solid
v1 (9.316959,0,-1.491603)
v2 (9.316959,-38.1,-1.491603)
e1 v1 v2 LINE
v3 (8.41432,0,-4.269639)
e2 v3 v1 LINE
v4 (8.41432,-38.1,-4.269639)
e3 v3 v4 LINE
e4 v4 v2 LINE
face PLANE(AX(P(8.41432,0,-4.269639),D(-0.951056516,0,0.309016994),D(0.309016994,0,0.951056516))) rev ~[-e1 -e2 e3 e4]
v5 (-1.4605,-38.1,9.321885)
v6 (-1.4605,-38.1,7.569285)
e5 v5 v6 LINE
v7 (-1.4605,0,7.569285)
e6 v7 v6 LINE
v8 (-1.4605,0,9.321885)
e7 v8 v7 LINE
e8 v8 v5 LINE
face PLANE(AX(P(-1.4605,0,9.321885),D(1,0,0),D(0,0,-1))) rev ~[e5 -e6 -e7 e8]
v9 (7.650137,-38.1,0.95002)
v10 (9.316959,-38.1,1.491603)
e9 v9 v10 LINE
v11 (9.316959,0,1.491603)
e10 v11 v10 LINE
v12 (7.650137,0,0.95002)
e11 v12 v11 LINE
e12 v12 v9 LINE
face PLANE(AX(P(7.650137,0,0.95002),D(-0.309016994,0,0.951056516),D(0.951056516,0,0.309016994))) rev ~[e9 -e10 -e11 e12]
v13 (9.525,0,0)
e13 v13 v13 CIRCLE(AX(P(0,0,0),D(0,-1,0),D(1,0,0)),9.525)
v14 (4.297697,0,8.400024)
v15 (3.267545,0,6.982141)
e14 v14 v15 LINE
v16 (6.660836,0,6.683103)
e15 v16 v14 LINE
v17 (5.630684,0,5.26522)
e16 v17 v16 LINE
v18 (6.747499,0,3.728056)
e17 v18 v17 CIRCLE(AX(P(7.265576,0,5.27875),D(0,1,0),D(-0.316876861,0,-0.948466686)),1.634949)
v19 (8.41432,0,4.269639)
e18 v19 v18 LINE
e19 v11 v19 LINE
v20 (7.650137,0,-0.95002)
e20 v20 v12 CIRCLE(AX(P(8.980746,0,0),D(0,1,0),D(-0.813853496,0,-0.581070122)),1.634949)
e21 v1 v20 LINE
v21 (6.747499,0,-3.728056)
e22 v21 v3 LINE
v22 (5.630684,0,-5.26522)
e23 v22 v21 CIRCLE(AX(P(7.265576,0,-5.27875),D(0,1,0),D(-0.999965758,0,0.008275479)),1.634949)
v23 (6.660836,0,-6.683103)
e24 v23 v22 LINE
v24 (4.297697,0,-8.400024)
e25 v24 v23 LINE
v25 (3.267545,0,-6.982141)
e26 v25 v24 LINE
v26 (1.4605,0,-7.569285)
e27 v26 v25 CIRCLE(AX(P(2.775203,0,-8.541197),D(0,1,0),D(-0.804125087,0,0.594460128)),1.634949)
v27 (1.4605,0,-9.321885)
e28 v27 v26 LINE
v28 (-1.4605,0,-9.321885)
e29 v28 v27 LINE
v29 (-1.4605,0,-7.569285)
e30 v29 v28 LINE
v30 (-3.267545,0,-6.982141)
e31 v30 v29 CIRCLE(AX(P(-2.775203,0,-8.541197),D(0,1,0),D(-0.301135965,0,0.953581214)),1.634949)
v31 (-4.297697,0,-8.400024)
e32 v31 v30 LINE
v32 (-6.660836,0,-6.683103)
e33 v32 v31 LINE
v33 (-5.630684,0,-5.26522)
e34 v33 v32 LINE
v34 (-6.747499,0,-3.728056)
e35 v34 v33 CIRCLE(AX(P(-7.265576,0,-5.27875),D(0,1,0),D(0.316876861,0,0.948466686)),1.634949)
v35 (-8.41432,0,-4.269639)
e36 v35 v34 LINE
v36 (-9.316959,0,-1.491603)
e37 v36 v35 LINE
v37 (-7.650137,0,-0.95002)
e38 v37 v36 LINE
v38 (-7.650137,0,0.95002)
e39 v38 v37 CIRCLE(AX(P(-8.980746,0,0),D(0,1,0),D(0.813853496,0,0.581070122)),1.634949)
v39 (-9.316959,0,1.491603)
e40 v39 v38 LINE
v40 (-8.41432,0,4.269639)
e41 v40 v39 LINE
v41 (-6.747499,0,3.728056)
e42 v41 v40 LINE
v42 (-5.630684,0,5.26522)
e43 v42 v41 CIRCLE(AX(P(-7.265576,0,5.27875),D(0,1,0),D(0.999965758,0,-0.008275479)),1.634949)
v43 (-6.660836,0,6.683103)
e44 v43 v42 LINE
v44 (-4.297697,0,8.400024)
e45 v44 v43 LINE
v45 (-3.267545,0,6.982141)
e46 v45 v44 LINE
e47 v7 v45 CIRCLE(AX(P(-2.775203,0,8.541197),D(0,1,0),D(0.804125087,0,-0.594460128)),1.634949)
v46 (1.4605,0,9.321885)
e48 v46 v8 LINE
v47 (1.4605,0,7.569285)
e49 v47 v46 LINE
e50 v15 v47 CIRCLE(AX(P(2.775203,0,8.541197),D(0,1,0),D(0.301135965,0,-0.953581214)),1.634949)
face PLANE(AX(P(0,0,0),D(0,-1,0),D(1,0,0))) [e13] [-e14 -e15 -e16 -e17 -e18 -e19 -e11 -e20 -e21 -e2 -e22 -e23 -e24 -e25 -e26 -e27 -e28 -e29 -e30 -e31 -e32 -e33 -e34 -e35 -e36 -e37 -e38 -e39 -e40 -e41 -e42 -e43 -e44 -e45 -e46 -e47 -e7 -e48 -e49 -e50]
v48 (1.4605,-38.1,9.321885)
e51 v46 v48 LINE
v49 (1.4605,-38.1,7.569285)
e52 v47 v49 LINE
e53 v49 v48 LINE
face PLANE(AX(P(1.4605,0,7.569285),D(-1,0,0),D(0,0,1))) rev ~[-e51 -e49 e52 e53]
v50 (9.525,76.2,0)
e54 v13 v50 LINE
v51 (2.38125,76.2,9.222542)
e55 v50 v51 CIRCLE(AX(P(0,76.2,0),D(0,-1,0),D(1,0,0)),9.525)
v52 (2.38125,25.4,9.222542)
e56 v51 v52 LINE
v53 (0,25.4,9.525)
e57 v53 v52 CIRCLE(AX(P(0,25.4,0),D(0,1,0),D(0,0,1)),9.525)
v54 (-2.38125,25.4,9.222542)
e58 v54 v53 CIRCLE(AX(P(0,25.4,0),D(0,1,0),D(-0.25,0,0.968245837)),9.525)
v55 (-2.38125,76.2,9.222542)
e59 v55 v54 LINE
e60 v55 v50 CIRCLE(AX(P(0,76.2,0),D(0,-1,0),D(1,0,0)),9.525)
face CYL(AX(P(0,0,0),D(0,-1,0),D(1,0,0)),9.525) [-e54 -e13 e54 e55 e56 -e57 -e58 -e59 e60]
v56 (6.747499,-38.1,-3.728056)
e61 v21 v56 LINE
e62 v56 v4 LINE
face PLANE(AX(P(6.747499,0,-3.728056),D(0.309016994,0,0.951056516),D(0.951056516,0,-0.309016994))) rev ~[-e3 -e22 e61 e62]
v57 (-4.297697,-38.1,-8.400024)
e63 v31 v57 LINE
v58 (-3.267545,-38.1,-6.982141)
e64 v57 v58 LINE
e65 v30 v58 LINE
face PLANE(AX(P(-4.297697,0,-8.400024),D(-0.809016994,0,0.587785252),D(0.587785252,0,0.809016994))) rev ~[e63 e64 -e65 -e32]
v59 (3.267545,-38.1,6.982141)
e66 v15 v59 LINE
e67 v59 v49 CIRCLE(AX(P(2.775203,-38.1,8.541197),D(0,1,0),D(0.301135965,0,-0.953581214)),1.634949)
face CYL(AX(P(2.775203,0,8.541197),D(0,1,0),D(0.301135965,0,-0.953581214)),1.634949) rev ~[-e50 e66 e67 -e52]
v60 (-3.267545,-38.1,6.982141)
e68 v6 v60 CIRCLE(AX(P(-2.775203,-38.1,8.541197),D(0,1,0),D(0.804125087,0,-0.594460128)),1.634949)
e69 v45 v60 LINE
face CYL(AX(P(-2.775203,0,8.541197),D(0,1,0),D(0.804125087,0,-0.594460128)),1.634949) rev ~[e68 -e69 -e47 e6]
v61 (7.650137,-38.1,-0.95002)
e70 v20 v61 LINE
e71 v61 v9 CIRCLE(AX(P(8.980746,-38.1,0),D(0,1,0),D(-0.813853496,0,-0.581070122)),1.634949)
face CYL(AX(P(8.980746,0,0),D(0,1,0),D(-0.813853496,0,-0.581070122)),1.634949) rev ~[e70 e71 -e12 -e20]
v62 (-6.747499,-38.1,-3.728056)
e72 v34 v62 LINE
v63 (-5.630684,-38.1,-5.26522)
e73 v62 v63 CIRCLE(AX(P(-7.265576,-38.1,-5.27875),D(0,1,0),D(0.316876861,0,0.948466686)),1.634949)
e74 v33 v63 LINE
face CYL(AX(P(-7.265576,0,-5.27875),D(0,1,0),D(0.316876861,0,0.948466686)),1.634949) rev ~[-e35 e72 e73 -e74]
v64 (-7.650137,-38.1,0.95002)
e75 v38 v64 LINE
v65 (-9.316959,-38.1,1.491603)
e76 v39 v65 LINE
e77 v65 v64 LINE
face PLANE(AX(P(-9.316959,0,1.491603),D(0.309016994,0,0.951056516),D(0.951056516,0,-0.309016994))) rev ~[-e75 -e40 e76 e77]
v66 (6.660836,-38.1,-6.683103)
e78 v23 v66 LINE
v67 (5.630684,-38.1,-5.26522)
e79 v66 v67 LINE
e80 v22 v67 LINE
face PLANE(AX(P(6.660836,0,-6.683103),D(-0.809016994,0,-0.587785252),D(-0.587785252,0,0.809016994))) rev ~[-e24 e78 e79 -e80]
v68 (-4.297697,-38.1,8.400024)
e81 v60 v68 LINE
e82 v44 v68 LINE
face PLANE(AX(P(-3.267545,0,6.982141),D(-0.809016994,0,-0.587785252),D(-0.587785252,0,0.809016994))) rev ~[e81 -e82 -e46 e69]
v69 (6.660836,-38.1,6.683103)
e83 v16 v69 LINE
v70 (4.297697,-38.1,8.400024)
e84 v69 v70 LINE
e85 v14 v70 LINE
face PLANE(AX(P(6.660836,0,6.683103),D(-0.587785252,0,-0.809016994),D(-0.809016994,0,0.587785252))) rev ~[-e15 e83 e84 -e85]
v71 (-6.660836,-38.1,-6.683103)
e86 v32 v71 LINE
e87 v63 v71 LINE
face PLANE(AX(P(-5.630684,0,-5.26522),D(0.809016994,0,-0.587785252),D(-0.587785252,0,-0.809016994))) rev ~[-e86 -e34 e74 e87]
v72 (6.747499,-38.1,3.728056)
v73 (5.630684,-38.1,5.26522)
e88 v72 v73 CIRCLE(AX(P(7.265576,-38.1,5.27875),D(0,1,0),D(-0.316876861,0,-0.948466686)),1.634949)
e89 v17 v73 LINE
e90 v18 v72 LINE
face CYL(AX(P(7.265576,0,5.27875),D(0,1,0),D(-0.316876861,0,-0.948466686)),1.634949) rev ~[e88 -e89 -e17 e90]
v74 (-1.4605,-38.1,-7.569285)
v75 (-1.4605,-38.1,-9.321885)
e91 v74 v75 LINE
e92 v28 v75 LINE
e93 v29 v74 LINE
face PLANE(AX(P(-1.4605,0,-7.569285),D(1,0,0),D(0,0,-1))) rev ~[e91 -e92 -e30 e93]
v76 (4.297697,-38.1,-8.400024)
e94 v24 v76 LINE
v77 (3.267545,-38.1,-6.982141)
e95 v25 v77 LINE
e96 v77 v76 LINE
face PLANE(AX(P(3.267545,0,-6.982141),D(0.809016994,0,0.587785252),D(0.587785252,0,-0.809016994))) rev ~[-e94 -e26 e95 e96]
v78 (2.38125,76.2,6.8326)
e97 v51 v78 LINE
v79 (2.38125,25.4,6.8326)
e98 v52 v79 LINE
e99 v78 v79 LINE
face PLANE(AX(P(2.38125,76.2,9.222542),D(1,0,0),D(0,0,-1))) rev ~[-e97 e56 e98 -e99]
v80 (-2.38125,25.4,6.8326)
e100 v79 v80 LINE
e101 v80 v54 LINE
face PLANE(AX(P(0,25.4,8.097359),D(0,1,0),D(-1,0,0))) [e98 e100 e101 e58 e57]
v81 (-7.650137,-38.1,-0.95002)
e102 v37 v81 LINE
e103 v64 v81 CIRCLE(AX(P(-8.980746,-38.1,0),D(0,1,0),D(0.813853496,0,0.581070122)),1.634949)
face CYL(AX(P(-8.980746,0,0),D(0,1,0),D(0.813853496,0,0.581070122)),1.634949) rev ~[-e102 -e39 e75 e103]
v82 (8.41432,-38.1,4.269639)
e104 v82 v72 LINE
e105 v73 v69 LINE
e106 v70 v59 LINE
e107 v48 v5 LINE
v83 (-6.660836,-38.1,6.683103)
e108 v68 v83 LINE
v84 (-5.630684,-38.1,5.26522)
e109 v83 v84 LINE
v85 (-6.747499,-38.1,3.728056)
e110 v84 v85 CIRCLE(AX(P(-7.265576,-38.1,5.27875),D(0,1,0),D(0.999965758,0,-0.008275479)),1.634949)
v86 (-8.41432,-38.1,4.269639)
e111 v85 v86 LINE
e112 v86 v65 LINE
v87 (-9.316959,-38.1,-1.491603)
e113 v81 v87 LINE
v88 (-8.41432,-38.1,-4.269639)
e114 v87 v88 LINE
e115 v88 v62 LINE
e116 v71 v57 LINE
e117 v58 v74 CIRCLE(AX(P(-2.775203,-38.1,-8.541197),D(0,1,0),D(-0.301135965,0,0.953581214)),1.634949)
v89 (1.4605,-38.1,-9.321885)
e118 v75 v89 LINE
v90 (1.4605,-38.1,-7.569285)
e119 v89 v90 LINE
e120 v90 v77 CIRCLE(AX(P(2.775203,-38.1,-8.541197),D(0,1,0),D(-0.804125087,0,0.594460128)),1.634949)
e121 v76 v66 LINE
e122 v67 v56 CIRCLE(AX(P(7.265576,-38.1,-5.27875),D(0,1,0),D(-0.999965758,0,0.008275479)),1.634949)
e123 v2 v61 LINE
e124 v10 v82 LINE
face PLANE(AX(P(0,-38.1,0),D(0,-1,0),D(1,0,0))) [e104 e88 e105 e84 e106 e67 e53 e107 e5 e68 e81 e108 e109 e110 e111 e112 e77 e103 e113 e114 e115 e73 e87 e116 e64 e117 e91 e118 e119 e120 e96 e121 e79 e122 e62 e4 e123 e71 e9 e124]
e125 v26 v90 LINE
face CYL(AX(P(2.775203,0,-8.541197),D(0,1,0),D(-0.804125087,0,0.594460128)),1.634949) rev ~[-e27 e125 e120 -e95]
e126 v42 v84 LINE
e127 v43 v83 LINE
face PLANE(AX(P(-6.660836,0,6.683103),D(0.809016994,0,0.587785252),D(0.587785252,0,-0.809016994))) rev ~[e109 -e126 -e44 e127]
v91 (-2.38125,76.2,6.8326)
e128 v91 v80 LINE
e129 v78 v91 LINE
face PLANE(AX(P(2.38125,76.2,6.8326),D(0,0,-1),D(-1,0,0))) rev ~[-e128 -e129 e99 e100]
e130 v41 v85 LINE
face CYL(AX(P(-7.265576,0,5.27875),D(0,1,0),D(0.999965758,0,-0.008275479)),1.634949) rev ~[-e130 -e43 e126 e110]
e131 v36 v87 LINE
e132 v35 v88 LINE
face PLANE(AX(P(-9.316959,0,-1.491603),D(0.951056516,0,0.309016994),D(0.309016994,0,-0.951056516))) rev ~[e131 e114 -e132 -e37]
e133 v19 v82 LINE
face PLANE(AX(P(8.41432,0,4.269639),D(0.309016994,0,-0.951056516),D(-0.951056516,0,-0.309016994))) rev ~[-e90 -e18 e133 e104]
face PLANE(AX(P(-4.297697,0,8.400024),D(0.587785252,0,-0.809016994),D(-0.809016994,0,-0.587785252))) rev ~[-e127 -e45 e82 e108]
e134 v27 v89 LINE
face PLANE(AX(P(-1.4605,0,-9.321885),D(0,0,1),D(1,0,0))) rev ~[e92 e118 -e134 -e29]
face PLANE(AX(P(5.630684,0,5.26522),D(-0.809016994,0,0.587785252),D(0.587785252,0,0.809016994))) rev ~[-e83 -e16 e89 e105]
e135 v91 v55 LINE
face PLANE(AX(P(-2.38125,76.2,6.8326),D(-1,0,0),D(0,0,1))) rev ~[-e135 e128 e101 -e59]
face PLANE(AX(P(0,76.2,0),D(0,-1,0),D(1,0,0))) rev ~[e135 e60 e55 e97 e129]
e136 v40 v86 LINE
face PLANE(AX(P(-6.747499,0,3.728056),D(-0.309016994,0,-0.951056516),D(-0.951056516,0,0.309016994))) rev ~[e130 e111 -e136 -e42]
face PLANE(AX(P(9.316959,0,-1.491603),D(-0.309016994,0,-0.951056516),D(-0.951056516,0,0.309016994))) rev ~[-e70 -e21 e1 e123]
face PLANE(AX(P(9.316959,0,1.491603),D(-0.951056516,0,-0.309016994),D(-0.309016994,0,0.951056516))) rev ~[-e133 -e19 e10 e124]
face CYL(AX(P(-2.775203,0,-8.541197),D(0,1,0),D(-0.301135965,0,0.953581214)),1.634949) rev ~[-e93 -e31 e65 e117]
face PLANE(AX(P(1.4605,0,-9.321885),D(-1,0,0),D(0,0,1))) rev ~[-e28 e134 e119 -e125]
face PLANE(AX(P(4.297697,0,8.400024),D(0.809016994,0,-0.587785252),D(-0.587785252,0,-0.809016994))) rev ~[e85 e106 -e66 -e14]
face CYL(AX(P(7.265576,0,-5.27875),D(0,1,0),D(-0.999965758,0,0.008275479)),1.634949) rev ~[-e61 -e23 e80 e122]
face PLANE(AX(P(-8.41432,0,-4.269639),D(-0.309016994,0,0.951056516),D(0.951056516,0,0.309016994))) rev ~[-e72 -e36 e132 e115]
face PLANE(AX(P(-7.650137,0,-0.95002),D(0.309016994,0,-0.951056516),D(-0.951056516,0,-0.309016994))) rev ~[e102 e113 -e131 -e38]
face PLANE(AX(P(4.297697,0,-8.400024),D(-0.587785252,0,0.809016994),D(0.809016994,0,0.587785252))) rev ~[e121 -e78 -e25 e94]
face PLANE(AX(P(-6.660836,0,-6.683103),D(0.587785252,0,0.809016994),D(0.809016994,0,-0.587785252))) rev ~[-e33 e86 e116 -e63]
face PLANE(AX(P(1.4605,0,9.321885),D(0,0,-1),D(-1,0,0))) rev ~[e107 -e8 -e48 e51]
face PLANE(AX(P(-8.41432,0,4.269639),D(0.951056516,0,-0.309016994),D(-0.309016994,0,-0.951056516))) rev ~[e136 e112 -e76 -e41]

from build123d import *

# Parameters (mm, degrees)
F1_DEPTH = 38.1
F2_R     = 9.525
F3_DEPTH = 76.2
F5_DEPTH = 50.8


# Not quite as in the source:
# - a feature names something its author has since deleted; it is built from what else it names


with BuildPart() as f1:
    # F0 (on Front) → F1 (new body)
    with BuildSketch(Plane.XZ):
        with BuildLine():
            Line((1.4605, 7.5692852344), (1.4605, 9.3218852344))
            Line((1.4605, 9.3218852344), (-1.4605, 9.3218852344))
            Line((-1.4605, 9.3218852344), (-1.4605, 7.5692852344))
            ThreePointArc((-1.4605, 7.5692852344), (-2.2699762391, 6.9862685009), (-3.2675449109, 6.9821407509))
            Line((-3.2675449109, 6.9821407509), (-4.2976973441, 8.4000239352))
            Line((-4.2976973441, 8.4000239352), (-6.6608359846, 6.6831032133))
            Line((-6.6608359846, 6.6831032133), (-5.6306835515, 5.2652200289))
            ThreePointArc((-5.6306835515, 5.2652200289), (-5.9428749476, 4.3177513881), (-6.7474987256, 3.7280558148))
            Line((-6.7474987256, 3.7280558148), (-8.4143203761, 4.2696389991))
            Line((-8.4143203761, 4.2696389991), (-9.3169590166, 1.491602915))
            Line((-9.3169590166, 1.491602915), (-7.6501373662, 0.9500197307))
            ThreePointArc((-7.6501373662, 0.9500197307), (-7.3457974171, 0), (-7.6501373662, -0.9500197307))
            Line((-7.6501373662, -0.9500197307), (-9.3169590166, -1.491602915))
            Line((-9.3169590166, -1.491602915), (-8.4143203761, -4.2696389991))
            Line((-8.4143203761, -4.2696389991), (-6.7474987256, -3.7280558148))
            ThreePointArc((-6.7474987256, -3.7280558148), (-5.9428749476, -4.3177513881), (-5.6306835515, -5.2652200289))
            Line((-5.6306835515, -5.2652200289), (-6.6608359846, -6.6831032133))
            Line((-6.6608359846, -6.6831032133), (-4.2976973441, -8.4000239352))
            Line((-4.2976973441, -8.4000239352), (-3.2675449109, -6.9821407509))
            ThreePointArc((-3.2675449109, -6.9821407509), (-2.2699762391, -6.9862685009), (-1.4605, -7.5692852344))
            Line((-1.4605, -7.5692852344), (-1.4605, -9.3218852344))
            Line((-1.4605, -9.3218852344), (1.4605, -9.3218852344))
            Line((1.4605, -9.3218852344), (1.4605, -7.5692852344))
            ThreePointArc((1.4605, -7.5692852344), (2.2699762391, -6.9862685009), (3.2675449109, -6.9821407509))
            Line((3.2675449109, -6.9821407509), (4.2976973441, -8.4000239352))
            Line((4.2976973441, -8.4000239352), (6.6608359846, -6.6831032133))
            Line((6.6608359846, -6.6831032133), (5.6306835515, -5.2652200289))
            ThreePointArc((5.6306835515, -5.2652200289), (5.9428749476, -4.3177513881), (6.7474987256, -3.7280558148))
            Line((6.7474987256, -3.7280558148), (8.4143203761, -4.2696389991))
            Line((8.4143203761, -4.2696389991), (9.3169590166, -1.491602915))
            Line((9.3169590166, -1.491602915), (7.6501373662, -0.9500197307))
            ThreePointArc((7.6501373662, -0.9500197307), (7.3457974171, 0), (7.6501373662, 0.9500197307))
            Line((7.6501373662, 0.9500197307), (9.3169590166, 1.491602915))
            Line((9.3169590166, 1.491602915), (8.4143203761, 4.2696389991))
            Line((8.4143203761, 4.2696389991), (6.7474987256, 3.7280558148))
            ThreePointArc((6.7474987256, 3.7280558148), (5.9428749476, 4.3177513881), (5.6306835515, 5.2652200289))
            Line((5.6306835515, 5.2652200289), (6.6608359846, 6.6831032133))
            Line((6.6608359846, 6.6831032133), (4.2976973441, 8.4000239352))
            Line((4.2976973441, 8.4000239352), (3.2675449109, 6.9821407509))
            ThreePointArc((3.2675449109, 6.9821407509), (2.2699762391, 6.9862685009), (1.4605, 7.5692852344))
        make_face()
    extrude(amount=F1_DEPTH)

    # F2 (on Front) → F3 (join)
    with BuildSketch(Plane.XZ):
        Circle(F2_R)
    extrude(amount=-F3_DEPTH)

    # F4 (on face) → F5 (cut)
    with BuildSketch(Plane(origin=(0, 76.2, 0), x_dir=(-1, 0, 0), z_dir=(0, 1, 0))):
        with BuildLine():
            ThreePointArc((2.38125, 9.2225415932), (1.2001908859, 9.4490828569), (0, 9.525))
            ThreePointArc((0, 9.525), (-1.2001908859, 9.4490828569), (-2.38125, 9.2225415932))
            Line((-2.38125, 9.2225415932), (-2.38125, 6.8326))
            Line((-2.38125, 6.8326), (2.38125, 6.8326))
            Line((2.38125, 6.8326), (2.38125, 9.2225415932))
        make_face()
    extrude(amount=-F5_DEPTH, mode=Mode.SUBTRACT)


solid = f1.part
